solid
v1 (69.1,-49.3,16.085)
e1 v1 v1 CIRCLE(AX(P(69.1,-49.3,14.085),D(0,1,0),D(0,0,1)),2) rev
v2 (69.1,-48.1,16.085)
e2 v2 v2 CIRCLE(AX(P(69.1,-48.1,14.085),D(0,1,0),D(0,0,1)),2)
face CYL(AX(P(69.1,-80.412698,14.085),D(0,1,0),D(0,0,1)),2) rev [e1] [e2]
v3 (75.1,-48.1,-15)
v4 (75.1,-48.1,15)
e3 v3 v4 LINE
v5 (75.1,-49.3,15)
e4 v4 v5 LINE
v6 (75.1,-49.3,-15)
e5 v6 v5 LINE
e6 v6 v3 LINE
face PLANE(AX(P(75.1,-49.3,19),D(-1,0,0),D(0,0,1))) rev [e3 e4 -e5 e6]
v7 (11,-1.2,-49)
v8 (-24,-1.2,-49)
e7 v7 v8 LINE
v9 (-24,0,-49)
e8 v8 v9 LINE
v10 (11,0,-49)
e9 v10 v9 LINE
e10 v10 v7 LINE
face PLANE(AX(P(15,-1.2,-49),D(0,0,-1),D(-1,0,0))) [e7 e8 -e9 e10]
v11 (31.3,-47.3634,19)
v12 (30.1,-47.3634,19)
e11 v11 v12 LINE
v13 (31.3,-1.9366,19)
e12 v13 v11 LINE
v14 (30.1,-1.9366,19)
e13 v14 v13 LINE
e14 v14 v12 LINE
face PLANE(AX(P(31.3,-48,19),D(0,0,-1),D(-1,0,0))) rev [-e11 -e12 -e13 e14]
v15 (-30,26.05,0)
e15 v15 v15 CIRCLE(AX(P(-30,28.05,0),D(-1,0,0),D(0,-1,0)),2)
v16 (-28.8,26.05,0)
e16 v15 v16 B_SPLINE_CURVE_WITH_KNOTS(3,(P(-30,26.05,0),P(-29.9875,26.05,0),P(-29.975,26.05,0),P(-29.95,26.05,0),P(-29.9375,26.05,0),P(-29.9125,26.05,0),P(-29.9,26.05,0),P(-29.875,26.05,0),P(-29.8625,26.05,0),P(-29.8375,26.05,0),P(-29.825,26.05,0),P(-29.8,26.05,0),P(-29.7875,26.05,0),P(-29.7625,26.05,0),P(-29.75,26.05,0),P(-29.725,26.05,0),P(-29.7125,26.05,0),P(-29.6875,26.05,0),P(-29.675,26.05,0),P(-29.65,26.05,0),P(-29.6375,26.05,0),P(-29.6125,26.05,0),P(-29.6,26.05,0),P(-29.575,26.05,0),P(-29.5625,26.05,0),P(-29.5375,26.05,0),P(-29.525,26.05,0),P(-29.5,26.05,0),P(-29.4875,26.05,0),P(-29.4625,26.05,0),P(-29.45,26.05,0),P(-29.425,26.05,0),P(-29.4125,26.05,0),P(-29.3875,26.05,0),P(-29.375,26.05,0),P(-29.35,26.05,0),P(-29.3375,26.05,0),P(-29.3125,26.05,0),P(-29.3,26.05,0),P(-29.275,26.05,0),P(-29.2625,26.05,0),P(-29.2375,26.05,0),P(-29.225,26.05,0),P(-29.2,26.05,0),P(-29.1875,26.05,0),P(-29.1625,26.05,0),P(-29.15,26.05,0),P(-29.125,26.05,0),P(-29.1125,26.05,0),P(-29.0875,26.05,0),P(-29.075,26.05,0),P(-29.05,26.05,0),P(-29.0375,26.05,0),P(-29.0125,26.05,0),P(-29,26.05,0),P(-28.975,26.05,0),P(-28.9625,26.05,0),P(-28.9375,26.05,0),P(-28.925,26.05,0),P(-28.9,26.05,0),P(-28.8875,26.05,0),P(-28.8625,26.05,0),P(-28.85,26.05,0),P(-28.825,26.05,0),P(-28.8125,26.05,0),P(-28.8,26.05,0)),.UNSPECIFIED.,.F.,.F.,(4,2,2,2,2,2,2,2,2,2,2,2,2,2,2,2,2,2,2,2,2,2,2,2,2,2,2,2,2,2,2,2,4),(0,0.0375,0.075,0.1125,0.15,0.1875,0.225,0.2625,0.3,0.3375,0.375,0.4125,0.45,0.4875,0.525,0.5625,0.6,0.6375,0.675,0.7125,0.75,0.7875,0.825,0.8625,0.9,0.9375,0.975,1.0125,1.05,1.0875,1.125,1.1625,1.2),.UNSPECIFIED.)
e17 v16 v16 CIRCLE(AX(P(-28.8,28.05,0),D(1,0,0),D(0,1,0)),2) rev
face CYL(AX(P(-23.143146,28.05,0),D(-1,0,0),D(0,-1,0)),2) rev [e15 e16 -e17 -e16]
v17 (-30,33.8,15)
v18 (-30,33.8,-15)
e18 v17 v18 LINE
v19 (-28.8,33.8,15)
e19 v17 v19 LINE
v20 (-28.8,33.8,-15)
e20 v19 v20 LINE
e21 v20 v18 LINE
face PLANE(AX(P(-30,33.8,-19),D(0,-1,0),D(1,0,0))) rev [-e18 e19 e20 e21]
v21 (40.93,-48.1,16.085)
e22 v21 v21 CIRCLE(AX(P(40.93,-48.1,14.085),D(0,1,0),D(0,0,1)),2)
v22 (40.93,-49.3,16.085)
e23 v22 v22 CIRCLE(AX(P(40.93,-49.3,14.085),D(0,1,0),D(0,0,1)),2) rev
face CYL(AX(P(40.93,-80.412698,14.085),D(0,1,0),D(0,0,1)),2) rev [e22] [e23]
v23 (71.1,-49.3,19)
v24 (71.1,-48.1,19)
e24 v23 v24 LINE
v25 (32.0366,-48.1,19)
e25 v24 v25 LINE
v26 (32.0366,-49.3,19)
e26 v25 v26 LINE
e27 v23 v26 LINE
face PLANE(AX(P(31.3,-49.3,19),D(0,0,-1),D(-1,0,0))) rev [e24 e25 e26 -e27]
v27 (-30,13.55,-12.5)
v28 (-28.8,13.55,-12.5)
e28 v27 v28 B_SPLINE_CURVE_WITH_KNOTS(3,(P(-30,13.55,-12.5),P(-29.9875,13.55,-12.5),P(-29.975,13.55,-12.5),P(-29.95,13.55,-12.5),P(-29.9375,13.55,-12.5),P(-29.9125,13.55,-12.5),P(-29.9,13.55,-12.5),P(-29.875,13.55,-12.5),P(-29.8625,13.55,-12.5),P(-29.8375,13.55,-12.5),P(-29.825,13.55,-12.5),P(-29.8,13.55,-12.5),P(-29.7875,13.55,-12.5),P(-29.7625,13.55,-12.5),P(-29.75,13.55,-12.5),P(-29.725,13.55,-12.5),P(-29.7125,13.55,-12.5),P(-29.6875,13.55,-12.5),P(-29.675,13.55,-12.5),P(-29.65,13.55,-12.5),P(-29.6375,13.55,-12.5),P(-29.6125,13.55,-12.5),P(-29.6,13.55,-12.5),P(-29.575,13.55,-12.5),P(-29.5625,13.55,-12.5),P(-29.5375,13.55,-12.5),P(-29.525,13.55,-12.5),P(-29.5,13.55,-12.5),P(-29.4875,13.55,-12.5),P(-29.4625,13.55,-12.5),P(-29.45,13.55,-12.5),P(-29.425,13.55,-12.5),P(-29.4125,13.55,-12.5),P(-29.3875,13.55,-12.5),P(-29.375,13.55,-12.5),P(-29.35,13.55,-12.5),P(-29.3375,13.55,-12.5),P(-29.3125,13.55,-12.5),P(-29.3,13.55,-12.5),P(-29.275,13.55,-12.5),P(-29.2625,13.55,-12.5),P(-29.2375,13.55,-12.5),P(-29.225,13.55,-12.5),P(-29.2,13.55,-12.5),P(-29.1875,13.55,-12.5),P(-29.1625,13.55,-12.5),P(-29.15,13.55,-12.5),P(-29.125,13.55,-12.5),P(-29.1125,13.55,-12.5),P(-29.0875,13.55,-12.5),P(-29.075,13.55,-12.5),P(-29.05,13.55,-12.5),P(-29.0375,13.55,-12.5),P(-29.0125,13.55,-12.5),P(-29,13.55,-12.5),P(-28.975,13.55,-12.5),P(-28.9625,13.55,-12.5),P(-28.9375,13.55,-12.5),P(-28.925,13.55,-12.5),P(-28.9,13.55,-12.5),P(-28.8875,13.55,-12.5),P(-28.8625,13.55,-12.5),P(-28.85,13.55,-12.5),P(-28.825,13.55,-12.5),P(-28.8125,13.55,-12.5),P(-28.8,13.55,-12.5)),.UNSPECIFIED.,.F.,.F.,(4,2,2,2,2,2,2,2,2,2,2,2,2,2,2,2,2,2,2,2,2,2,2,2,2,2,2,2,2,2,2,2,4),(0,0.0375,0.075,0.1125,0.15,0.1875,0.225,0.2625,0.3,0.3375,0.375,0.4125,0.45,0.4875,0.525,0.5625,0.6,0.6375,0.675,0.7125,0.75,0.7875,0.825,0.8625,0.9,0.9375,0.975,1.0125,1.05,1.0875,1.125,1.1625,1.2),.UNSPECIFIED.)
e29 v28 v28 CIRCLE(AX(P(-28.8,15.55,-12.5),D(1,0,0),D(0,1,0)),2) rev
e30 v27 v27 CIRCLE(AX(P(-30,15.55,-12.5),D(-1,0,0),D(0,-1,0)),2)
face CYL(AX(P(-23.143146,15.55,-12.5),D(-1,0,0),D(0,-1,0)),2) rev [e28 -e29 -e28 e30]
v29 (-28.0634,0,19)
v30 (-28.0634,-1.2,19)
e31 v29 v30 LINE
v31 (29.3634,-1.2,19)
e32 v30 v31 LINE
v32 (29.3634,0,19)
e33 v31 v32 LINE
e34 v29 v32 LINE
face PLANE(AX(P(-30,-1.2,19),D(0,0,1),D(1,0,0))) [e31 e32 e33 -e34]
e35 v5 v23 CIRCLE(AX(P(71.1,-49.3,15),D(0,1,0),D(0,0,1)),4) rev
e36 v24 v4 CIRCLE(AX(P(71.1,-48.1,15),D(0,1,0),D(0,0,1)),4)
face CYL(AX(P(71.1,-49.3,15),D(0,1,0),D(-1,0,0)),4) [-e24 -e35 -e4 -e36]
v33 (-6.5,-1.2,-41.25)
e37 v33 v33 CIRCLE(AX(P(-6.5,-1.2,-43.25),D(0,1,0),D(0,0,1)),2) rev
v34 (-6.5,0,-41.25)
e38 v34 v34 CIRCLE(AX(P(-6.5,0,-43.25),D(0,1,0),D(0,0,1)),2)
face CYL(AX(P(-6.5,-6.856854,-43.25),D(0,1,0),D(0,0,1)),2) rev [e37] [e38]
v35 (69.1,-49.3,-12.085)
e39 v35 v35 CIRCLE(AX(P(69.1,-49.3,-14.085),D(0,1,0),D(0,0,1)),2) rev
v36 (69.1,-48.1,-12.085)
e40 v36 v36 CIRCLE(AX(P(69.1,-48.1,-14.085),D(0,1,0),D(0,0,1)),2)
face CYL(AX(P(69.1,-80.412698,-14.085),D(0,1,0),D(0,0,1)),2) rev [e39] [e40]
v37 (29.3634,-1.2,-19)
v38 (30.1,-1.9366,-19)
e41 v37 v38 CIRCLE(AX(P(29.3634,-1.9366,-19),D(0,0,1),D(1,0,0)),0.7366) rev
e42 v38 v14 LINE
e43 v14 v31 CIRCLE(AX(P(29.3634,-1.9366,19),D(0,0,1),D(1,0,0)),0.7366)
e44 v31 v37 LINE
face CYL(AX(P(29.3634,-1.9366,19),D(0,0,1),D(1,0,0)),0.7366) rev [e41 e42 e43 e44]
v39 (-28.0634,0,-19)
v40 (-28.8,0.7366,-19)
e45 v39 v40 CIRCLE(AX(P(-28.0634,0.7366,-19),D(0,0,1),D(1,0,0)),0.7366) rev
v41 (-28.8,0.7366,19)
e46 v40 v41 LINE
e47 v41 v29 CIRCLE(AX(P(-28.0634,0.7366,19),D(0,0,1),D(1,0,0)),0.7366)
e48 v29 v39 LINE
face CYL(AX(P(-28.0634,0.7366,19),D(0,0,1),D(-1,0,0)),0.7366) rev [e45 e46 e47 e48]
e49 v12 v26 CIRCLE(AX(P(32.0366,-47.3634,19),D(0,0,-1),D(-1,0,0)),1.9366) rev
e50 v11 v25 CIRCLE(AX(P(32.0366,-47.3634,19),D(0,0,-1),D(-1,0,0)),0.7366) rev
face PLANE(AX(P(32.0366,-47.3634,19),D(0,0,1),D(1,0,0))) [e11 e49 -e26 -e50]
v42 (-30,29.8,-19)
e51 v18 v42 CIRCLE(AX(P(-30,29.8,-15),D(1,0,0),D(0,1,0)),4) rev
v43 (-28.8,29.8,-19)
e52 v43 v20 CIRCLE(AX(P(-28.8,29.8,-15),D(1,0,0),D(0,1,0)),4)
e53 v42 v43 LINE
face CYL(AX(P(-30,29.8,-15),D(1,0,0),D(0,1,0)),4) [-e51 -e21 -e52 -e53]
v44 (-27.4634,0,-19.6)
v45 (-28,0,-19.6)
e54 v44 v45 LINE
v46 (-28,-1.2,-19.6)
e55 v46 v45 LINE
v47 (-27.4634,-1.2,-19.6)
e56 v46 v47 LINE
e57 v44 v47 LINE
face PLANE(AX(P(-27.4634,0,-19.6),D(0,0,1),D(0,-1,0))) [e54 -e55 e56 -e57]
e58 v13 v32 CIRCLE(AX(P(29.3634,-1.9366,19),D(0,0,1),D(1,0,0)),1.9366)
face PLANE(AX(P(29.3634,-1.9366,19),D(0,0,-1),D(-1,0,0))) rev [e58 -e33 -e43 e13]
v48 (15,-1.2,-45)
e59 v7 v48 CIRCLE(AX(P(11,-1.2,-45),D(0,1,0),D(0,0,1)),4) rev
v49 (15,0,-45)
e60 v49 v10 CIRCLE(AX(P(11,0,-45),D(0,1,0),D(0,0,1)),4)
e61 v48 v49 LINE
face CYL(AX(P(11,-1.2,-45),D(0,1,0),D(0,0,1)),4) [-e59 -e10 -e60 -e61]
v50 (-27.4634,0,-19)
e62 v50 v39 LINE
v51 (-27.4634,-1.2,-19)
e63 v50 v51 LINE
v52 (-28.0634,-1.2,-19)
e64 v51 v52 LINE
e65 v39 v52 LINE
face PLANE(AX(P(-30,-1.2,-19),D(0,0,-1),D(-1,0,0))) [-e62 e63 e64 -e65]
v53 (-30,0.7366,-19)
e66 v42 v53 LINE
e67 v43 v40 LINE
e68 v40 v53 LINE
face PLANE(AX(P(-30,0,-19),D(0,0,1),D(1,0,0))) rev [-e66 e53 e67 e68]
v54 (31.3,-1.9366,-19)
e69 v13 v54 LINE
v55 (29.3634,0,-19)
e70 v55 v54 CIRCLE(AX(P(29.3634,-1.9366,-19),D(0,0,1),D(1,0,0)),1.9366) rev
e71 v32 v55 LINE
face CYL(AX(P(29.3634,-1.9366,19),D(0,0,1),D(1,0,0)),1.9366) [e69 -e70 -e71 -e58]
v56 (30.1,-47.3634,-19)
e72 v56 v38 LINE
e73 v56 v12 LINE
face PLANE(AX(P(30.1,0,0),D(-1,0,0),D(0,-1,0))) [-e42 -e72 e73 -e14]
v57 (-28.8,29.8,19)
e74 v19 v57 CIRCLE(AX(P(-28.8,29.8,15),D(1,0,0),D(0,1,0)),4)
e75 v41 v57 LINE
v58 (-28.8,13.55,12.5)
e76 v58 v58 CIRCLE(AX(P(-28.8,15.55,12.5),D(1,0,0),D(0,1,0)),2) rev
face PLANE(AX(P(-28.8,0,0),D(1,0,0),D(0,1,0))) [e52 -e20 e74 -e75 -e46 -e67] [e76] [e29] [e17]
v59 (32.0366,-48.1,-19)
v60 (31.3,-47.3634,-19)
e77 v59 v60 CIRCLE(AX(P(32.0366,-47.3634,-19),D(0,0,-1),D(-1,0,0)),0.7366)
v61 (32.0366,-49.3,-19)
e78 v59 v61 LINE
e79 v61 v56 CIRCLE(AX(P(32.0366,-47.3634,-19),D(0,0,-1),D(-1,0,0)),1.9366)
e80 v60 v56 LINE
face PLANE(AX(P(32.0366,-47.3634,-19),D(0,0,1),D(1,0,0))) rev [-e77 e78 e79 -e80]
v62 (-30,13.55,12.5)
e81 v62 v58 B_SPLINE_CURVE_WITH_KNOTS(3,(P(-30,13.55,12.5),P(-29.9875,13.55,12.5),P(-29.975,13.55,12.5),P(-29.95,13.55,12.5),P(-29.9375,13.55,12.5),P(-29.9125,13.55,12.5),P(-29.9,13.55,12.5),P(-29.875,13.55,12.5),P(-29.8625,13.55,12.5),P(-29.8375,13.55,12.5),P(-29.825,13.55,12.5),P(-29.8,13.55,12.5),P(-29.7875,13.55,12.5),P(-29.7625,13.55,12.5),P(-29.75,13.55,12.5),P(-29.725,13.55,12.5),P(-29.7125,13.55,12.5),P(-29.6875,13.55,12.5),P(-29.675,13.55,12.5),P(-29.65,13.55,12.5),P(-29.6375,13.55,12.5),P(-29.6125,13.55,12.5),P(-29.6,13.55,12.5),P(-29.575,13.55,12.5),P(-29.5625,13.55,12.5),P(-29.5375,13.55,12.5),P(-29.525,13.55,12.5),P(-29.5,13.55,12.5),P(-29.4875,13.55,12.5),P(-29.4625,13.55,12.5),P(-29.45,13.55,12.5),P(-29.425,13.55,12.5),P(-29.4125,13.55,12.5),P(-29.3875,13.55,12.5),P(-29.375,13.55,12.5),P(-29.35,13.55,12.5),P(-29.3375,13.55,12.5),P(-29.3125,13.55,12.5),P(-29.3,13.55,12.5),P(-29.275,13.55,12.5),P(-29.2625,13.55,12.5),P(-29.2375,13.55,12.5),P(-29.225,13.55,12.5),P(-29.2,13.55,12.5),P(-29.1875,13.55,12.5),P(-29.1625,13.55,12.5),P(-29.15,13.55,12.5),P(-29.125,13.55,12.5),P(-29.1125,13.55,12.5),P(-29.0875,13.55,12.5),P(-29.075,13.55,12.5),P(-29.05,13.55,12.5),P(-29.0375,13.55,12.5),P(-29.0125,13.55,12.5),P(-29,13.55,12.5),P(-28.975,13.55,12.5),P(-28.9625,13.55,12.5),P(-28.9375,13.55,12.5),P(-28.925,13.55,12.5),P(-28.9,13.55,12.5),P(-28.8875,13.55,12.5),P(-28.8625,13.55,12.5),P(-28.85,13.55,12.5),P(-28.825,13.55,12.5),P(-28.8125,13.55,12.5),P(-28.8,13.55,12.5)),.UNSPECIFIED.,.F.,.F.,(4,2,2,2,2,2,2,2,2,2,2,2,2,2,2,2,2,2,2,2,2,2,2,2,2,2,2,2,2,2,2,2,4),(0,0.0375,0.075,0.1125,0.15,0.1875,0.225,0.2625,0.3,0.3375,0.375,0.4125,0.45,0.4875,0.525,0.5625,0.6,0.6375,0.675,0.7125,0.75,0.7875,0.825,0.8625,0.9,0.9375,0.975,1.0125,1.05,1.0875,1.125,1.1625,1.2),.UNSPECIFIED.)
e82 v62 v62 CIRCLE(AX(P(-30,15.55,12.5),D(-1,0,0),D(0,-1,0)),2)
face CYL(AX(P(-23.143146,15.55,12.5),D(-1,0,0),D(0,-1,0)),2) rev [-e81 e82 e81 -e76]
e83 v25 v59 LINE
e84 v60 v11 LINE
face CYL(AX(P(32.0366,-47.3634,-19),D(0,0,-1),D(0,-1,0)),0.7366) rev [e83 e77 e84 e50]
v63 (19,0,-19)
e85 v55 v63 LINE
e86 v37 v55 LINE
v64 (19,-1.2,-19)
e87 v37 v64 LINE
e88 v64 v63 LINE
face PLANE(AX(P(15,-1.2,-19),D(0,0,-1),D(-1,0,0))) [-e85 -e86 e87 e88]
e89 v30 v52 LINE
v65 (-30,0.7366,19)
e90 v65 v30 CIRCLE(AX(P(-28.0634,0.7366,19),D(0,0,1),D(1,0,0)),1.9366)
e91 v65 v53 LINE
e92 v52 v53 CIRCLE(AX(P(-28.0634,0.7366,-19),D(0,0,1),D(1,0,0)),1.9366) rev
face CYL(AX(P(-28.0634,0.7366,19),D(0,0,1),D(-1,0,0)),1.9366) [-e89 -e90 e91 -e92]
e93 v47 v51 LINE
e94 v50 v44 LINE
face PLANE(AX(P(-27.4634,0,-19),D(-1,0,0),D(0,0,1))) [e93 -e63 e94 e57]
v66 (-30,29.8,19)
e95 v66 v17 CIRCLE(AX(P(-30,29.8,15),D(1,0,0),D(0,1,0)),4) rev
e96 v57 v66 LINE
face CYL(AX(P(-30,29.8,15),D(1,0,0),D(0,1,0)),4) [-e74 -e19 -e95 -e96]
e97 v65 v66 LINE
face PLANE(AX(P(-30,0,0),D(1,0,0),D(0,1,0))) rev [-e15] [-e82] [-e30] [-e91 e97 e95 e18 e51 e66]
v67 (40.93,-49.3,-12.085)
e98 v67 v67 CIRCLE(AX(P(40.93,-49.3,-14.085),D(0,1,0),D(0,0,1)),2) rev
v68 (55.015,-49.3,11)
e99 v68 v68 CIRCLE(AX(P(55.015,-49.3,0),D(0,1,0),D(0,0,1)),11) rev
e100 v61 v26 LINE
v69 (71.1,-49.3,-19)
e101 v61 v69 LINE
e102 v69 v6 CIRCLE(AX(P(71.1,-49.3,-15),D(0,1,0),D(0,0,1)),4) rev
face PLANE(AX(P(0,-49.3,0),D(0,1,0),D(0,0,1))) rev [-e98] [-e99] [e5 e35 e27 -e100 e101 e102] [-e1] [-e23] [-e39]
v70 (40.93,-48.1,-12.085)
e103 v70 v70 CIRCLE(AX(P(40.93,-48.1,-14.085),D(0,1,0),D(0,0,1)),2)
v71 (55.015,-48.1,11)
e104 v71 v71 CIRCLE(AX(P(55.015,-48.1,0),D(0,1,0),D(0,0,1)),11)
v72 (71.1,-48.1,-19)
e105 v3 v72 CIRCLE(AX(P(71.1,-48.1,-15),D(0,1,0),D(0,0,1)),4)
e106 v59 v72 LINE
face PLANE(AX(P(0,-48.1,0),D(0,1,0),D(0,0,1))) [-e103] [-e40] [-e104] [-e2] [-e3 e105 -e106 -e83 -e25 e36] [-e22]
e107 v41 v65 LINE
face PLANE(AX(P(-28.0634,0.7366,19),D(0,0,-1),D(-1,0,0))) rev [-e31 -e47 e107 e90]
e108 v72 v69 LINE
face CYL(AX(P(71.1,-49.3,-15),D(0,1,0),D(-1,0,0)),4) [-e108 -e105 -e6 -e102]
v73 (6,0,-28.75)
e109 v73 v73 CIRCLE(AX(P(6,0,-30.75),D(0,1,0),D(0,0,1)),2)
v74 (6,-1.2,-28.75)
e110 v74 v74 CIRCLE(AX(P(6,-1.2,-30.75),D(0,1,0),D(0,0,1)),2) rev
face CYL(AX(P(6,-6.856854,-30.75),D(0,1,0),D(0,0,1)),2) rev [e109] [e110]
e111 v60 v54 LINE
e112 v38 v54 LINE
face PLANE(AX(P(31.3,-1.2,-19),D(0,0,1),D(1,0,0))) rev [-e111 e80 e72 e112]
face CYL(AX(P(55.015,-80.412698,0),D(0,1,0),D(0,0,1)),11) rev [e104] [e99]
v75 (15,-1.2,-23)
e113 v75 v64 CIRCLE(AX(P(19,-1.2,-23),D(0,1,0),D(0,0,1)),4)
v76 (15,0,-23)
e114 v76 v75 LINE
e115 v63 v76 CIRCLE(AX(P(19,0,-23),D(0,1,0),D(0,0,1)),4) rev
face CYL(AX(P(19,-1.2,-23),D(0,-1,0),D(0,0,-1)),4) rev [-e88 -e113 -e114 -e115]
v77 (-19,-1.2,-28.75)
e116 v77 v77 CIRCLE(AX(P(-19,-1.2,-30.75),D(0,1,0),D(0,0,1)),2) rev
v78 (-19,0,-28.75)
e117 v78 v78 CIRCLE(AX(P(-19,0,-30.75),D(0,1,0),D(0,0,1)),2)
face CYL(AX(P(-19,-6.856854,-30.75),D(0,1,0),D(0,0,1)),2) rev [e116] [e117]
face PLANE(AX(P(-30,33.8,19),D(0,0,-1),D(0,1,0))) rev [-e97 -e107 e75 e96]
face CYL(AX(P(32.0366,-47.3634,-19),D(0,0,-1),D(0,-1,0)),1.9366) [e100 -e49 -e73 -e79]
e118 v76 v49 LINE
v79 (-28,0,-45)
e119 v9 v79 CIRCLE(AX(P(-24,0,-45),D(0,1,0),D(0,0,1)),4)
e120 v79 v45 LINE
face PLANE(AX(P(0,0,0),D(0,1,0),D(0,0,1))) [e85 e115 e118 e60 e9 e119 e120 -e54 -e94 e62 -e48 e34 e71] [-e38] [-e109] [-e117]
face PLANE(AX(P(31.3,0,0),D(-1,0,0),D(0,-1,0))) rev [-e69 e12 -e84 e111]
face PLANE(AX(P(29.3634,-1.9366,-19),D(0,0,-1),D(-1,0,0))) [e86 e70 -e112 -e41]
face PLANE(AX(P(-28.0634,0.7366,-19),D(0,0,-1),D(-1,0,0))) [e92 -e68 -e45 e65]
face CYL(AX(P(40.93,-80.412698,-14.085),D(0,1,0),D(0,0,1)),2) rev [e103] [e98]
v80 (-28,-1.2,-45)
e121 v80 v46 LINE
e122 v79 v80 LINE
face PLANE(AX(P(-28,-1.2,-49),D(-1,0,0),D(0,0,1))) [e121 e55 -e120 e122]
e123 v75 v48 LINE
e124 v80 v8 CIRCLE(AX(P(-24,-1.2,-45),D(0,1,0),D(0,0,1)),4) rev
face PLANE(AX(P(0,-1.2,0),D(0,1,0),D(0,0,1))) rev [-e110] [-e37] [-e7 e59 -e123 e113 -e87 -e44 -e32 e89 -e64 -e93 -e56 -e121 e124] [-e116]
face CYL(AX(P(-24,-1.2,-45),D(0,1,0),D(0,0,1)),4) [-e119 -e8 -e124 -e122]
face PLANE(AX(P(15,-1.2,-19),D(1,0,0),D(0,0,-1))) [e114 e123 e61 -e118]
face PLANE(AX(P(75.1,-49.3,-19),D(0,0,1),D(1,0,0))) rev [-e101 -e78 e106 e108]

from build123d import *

# Parameters (mm, degrees)
BRIDA_BASE1_DEPTH                = 1.2
BRIDA_START                      = -19
BRIDA_DE_ARISTA1_DEPTH           = 38
BRIDA_START_2                    = -19.6
BRIDA_DE_ARISTA1_2_OUTLINE_W     = 0.5366
BRIDA_DE_ARISTA1_2_OUTLINE_H     = 1.2
BRIDA_DE_ARISTA1_2_DEPTH         = 0.6
BRIDA_DE_ARISTA1_3_DEPTH         = 38
CROQUIS12_R                      = 2
CORTAR_EXTRUIR1_DEPTH            = 1.2
CROQUIS15_R                      = 2
CORTAR_EXTRUIR3_DEPTH            = 1.2
REDONDEO3_R                      = 4
BRIDA_DE_ARISTA2_STRIP_W         = 6.3732
BRIDA_DE_ARISTA2_STRIP_H         = 1.2
BRIDA_DE_ARISTA2_STRIP_CUT_DEPTH = 38
BRIDA_DE_ARISTA2_DEPTH           = 38
BRIDA_DE_ARISTA3_STRIP_W         = 6.3732
BRIDA_DE_ARISTA3_STRIP_H         = 1.2
BRIDA_DE_ARISTA3_STRIP_CUT_DEPTH = 38
BRIDA_DE_ARISTA3_DEPTH           = 38
CROQUIS22_R                      = 2
CROQUIS22_R_2                    = 11
CORTAR_EXTRUIR4_DEPTH            = 1.2
REDONDEO4_R                      = 4


# Read off the part's stored shape, not the designer's step: Brida de arista1
# Sheet-metal steps are written as plain solids
with BuildPart() as part:
    # Croquis1 → Brida base1 (new body)
    with BuildSketch(Plane(origin=(0, 0, 0), x_dir=(1, 0, 0), z_dir=(0, 1, 0))):
        Polygon((-30, -19), (30, -19), (30, 19), (15, 19), (15, 49), (-28, 49), (-28, 19), (-30, 19), align=None)
    extrude(amount=-BRIDA_BASE1_DEPTH)

    # Brida de arista1 outline → Brida de arista1 (cut)
    with BuildSketch(Plane.XY.offset(BRIDA_START)):
        with BuildLine():
            Line((-30, -1.2), (-28.0634, -1.2))
            ThreePointArc((-28.0634, -1.2), (-29.141342484, -0.872269031), (-29.854444388, 0))
            Line((-29.854444388, 0), (-30, 0))
            Line((-30, 0), (-30, -1.2))
        make_face()
    extrude(amount=BRIDA_DE_ARISTA1_DEPTH, mode=Mode.SUBTRACT)

    # Brida de arista1 2 outline → Brida de arista1 2 (cut)
    with BuildSketch(Plane.XY.offset(BRIDA_START_2)):
        with Locations((-27.7317, -0.6)):
            Rectangle(BRIDA_DE_ARISTA1_2_OUTLINE_W, BRIDA_DE_ARISTA1_2_OUTLINE_H)
    extrude(amount=BRIDA_DE_ARISTA1_2_DEPTH, mode=Mode.SUBTRACT)

    # Brida de arista1 3 outline → Brida de arista1 3 (add)
    with BuildSketch(Plane.XY.offset(BRIDA_START)):
        with BuildLine():
            Line((-29.854444388, 0), (-28.0634, 0))
            ThreePointArc((-28.0634, 0), (-28.584254855, 0.215745145), (-28.8, 0.7366))
            Line((-28.8, 0.7366), (-28.8, 33.8))
            Line((-28.8, 33.8), (-30, 33.8))
            Line((-30, 33.8), (-30, 0.7366))
            ThreePointArc((-30, 0.7366), (-29.963262642, 0.361178238), (-29.854444388, 0))
        make_face()
    extrude(amount=BRIDA_DE_ARISTA1_3_DEPTH)

    # Croquis12 → Cortar-Extruir1 (cut)
    with BuildSketch(Plane(origin=(0, 0, 0), x_dir=(1, 0, 0), z_dir=(0, 1, 0))):
        with Locations(Location((6, 30.75, 0), (0, 0, 270))):
            Circle(CROQUIS12_R)
        with Locations(Location((-19, 30.75, 0), (0, 0, 270))):
            Circle(CROQUIS12_R)
        with Locations(Location((-6.5, 43.25, 0), (0, 0, 270))):
            Circle(CROQUIS12_R)
    extrude(amount=-CORTAR_EXTRUIR1_DEPTH, mode=Mode.SUBTRACT)

    # Croquis15 → Cortar-Extruir3 (cut)
    with BuildSketch(Plane.ZY.offset(30)):
        with Locations(Location((-12.5, 15.55, 0), (0, 0, 270))):
            Circle(CROQUIS15_R)
        with Locations(Location((12.5, 15.55, 0), (0, 0, 270))):
            Circle(CROQUIS15_R)
        with Locations(Location((0, 28.05, 0), (0, 0, 270))):
            Circle(CROQUIS15_R)
    extrude(amount=-CORTAR_EXTRUIR3_DEPTH, mode=Mode.SUBTRACT)

    # Redondeo3
    redondeo3_edges = [part.edges().sort_by_distance(p)[0] for p in [
        (-28, -0.6, -49),
        (15, -0.6, -49),
        (15, -0.6, -19),
        (-29.4, 33.8, -19),
        (-29.4, 33.8, 19),
    ]]
    fillet(redondeo3_edges, radius=REDONDEO3_R)

    # Brida de arista2 strip (across the edge) → Brida de arista2 strip cut (cut)
    with BuildSketch(Plane(origin=(30.1, -1.2, -19), x_dir=(-1, 0, 0), z_dir=(0, 0, 1))):
        with Locations((-2.45, -0.6)):
            Rectangle(BRIDA_DE_ARISTA2_STRIP_W, BRIDA_DE_ARISTA2_STRIP_H)
    extrude(amount=BRIDA_DE_ARISTA2_STRIP_CUT_DEPTH, mode=Mode.SUBTRACT)

    # Brida de arista2 section (across the edge) → Brida de arista2 (add)
    with BuildSketch(Plane(origin=(30.1, -1.2, -19), x_dir=(-1, 0, 0), z_dir=(0, 0, 1))):
        with BuildLine():
            Line((-1.2, 0.7366), (-1.2, 46.8))
            Line((-1.2, 46.8), (0, 46.8))
            Line((0, 46.8), (0, 0.7366))
            ThreePointArc((0, 0.7366), (0.215745145, 0.215745145), (0.7366, 0))
            Line((0.7366, 0), (0.7366, -1.2))
            ThreePointArc((0.7366, -1.2), (-0.632782992, -0.632782992), (-1.2, 0.7366))
        make_face()
    extrude(amount=BRIDA_DE_ARISTA2_DEPTH)

    # Brida de arista3 strip (across the edge) → Brida de arista3 strip cut (cut)
    with BuildSketch(Plane(origin=(31.3, -48.1, 19), x_dir=(0, 1, 0), z_dir=(0, 0, -1))):
        with Locations((-2.45, -0.6)):
            Rectangle(BRIDA_DE_ARISTA3_STRIP_W, BRIDA_DE_ARISTA3_STRIP_H)
    extrude(amount=BRIDA_DE_ARISTA3_STRIP_CUT_DEPTH, mode=Mode.SUBTRACT)

    # Brida de arista3 section (across the edge) → Brida de arista3 (add)
    with BuildSketch(Plane(origin=(31.3, -48.1, 19), x_dir=(0, 1, 0), z_dir=(0, 0, -1))):
        with BuildLine():
            Line((-1.2, 0.7366), (-1.2, 43.8))
            Line((-1.2, 43.8), (0, 43.8))
            Line((0, 43.8), (0, 0.7366))
            ThreePointArc((0, 0.7366), (0.215745145, 0.215745145), (0.7366, 0))
            Line((0.7366, 0), (0.7366, -1.2))
            ThreePointArc((0.7366, -1.2), (-0.632782992, -0.632782992), (-1.2, 0.7366))
        make_face()
    extrude(amount=BRIDA_DE_ARISTA3_DEPTH)

    # Croquis22 → Cortar-Extruir4 (cut)
    with BuildSketch(Plane(origin=(0, -48.1, 0), x_dir=(1, 0, 0), z_dir=(0, 1, 0))):
        with Locations(Location((69.1, -14.085, 0), (0, 0, 270))):
            Circle(CROQUIS22_R)
        with Locations(Location((40.93, -14.085, 0), (0, 0, 270))):
            Circle(CROQUIS22_R)
        with Locations(Location((69.1, 14.085, 0), (0, 0, 270))):
            Circle(CROQUIS22_R)
        with Locations(Location((40.93, 14.085, 0), (0, 0, 270))):
            Circle(CROQUIS22_R)
        with Locations(Location((55.015, 0, 0), (0, 0, 270))):
            Circle(CROQUIS22_R_2)
    extrude(amount=-CORTAR_EXTRUIR4_DEPTH, mode=Mode.SUBTRACT)

    # Redondeo4
    redondeo4_edges = [part.edges().sort_by_distance(p)[0] for p in [
        (75.1, -48.7, 19),
        (75.1, -48.7, -19),
    ]]
    fillet(redondeo4_edges, radius=REDONDEO4_R)


solid = part.part
